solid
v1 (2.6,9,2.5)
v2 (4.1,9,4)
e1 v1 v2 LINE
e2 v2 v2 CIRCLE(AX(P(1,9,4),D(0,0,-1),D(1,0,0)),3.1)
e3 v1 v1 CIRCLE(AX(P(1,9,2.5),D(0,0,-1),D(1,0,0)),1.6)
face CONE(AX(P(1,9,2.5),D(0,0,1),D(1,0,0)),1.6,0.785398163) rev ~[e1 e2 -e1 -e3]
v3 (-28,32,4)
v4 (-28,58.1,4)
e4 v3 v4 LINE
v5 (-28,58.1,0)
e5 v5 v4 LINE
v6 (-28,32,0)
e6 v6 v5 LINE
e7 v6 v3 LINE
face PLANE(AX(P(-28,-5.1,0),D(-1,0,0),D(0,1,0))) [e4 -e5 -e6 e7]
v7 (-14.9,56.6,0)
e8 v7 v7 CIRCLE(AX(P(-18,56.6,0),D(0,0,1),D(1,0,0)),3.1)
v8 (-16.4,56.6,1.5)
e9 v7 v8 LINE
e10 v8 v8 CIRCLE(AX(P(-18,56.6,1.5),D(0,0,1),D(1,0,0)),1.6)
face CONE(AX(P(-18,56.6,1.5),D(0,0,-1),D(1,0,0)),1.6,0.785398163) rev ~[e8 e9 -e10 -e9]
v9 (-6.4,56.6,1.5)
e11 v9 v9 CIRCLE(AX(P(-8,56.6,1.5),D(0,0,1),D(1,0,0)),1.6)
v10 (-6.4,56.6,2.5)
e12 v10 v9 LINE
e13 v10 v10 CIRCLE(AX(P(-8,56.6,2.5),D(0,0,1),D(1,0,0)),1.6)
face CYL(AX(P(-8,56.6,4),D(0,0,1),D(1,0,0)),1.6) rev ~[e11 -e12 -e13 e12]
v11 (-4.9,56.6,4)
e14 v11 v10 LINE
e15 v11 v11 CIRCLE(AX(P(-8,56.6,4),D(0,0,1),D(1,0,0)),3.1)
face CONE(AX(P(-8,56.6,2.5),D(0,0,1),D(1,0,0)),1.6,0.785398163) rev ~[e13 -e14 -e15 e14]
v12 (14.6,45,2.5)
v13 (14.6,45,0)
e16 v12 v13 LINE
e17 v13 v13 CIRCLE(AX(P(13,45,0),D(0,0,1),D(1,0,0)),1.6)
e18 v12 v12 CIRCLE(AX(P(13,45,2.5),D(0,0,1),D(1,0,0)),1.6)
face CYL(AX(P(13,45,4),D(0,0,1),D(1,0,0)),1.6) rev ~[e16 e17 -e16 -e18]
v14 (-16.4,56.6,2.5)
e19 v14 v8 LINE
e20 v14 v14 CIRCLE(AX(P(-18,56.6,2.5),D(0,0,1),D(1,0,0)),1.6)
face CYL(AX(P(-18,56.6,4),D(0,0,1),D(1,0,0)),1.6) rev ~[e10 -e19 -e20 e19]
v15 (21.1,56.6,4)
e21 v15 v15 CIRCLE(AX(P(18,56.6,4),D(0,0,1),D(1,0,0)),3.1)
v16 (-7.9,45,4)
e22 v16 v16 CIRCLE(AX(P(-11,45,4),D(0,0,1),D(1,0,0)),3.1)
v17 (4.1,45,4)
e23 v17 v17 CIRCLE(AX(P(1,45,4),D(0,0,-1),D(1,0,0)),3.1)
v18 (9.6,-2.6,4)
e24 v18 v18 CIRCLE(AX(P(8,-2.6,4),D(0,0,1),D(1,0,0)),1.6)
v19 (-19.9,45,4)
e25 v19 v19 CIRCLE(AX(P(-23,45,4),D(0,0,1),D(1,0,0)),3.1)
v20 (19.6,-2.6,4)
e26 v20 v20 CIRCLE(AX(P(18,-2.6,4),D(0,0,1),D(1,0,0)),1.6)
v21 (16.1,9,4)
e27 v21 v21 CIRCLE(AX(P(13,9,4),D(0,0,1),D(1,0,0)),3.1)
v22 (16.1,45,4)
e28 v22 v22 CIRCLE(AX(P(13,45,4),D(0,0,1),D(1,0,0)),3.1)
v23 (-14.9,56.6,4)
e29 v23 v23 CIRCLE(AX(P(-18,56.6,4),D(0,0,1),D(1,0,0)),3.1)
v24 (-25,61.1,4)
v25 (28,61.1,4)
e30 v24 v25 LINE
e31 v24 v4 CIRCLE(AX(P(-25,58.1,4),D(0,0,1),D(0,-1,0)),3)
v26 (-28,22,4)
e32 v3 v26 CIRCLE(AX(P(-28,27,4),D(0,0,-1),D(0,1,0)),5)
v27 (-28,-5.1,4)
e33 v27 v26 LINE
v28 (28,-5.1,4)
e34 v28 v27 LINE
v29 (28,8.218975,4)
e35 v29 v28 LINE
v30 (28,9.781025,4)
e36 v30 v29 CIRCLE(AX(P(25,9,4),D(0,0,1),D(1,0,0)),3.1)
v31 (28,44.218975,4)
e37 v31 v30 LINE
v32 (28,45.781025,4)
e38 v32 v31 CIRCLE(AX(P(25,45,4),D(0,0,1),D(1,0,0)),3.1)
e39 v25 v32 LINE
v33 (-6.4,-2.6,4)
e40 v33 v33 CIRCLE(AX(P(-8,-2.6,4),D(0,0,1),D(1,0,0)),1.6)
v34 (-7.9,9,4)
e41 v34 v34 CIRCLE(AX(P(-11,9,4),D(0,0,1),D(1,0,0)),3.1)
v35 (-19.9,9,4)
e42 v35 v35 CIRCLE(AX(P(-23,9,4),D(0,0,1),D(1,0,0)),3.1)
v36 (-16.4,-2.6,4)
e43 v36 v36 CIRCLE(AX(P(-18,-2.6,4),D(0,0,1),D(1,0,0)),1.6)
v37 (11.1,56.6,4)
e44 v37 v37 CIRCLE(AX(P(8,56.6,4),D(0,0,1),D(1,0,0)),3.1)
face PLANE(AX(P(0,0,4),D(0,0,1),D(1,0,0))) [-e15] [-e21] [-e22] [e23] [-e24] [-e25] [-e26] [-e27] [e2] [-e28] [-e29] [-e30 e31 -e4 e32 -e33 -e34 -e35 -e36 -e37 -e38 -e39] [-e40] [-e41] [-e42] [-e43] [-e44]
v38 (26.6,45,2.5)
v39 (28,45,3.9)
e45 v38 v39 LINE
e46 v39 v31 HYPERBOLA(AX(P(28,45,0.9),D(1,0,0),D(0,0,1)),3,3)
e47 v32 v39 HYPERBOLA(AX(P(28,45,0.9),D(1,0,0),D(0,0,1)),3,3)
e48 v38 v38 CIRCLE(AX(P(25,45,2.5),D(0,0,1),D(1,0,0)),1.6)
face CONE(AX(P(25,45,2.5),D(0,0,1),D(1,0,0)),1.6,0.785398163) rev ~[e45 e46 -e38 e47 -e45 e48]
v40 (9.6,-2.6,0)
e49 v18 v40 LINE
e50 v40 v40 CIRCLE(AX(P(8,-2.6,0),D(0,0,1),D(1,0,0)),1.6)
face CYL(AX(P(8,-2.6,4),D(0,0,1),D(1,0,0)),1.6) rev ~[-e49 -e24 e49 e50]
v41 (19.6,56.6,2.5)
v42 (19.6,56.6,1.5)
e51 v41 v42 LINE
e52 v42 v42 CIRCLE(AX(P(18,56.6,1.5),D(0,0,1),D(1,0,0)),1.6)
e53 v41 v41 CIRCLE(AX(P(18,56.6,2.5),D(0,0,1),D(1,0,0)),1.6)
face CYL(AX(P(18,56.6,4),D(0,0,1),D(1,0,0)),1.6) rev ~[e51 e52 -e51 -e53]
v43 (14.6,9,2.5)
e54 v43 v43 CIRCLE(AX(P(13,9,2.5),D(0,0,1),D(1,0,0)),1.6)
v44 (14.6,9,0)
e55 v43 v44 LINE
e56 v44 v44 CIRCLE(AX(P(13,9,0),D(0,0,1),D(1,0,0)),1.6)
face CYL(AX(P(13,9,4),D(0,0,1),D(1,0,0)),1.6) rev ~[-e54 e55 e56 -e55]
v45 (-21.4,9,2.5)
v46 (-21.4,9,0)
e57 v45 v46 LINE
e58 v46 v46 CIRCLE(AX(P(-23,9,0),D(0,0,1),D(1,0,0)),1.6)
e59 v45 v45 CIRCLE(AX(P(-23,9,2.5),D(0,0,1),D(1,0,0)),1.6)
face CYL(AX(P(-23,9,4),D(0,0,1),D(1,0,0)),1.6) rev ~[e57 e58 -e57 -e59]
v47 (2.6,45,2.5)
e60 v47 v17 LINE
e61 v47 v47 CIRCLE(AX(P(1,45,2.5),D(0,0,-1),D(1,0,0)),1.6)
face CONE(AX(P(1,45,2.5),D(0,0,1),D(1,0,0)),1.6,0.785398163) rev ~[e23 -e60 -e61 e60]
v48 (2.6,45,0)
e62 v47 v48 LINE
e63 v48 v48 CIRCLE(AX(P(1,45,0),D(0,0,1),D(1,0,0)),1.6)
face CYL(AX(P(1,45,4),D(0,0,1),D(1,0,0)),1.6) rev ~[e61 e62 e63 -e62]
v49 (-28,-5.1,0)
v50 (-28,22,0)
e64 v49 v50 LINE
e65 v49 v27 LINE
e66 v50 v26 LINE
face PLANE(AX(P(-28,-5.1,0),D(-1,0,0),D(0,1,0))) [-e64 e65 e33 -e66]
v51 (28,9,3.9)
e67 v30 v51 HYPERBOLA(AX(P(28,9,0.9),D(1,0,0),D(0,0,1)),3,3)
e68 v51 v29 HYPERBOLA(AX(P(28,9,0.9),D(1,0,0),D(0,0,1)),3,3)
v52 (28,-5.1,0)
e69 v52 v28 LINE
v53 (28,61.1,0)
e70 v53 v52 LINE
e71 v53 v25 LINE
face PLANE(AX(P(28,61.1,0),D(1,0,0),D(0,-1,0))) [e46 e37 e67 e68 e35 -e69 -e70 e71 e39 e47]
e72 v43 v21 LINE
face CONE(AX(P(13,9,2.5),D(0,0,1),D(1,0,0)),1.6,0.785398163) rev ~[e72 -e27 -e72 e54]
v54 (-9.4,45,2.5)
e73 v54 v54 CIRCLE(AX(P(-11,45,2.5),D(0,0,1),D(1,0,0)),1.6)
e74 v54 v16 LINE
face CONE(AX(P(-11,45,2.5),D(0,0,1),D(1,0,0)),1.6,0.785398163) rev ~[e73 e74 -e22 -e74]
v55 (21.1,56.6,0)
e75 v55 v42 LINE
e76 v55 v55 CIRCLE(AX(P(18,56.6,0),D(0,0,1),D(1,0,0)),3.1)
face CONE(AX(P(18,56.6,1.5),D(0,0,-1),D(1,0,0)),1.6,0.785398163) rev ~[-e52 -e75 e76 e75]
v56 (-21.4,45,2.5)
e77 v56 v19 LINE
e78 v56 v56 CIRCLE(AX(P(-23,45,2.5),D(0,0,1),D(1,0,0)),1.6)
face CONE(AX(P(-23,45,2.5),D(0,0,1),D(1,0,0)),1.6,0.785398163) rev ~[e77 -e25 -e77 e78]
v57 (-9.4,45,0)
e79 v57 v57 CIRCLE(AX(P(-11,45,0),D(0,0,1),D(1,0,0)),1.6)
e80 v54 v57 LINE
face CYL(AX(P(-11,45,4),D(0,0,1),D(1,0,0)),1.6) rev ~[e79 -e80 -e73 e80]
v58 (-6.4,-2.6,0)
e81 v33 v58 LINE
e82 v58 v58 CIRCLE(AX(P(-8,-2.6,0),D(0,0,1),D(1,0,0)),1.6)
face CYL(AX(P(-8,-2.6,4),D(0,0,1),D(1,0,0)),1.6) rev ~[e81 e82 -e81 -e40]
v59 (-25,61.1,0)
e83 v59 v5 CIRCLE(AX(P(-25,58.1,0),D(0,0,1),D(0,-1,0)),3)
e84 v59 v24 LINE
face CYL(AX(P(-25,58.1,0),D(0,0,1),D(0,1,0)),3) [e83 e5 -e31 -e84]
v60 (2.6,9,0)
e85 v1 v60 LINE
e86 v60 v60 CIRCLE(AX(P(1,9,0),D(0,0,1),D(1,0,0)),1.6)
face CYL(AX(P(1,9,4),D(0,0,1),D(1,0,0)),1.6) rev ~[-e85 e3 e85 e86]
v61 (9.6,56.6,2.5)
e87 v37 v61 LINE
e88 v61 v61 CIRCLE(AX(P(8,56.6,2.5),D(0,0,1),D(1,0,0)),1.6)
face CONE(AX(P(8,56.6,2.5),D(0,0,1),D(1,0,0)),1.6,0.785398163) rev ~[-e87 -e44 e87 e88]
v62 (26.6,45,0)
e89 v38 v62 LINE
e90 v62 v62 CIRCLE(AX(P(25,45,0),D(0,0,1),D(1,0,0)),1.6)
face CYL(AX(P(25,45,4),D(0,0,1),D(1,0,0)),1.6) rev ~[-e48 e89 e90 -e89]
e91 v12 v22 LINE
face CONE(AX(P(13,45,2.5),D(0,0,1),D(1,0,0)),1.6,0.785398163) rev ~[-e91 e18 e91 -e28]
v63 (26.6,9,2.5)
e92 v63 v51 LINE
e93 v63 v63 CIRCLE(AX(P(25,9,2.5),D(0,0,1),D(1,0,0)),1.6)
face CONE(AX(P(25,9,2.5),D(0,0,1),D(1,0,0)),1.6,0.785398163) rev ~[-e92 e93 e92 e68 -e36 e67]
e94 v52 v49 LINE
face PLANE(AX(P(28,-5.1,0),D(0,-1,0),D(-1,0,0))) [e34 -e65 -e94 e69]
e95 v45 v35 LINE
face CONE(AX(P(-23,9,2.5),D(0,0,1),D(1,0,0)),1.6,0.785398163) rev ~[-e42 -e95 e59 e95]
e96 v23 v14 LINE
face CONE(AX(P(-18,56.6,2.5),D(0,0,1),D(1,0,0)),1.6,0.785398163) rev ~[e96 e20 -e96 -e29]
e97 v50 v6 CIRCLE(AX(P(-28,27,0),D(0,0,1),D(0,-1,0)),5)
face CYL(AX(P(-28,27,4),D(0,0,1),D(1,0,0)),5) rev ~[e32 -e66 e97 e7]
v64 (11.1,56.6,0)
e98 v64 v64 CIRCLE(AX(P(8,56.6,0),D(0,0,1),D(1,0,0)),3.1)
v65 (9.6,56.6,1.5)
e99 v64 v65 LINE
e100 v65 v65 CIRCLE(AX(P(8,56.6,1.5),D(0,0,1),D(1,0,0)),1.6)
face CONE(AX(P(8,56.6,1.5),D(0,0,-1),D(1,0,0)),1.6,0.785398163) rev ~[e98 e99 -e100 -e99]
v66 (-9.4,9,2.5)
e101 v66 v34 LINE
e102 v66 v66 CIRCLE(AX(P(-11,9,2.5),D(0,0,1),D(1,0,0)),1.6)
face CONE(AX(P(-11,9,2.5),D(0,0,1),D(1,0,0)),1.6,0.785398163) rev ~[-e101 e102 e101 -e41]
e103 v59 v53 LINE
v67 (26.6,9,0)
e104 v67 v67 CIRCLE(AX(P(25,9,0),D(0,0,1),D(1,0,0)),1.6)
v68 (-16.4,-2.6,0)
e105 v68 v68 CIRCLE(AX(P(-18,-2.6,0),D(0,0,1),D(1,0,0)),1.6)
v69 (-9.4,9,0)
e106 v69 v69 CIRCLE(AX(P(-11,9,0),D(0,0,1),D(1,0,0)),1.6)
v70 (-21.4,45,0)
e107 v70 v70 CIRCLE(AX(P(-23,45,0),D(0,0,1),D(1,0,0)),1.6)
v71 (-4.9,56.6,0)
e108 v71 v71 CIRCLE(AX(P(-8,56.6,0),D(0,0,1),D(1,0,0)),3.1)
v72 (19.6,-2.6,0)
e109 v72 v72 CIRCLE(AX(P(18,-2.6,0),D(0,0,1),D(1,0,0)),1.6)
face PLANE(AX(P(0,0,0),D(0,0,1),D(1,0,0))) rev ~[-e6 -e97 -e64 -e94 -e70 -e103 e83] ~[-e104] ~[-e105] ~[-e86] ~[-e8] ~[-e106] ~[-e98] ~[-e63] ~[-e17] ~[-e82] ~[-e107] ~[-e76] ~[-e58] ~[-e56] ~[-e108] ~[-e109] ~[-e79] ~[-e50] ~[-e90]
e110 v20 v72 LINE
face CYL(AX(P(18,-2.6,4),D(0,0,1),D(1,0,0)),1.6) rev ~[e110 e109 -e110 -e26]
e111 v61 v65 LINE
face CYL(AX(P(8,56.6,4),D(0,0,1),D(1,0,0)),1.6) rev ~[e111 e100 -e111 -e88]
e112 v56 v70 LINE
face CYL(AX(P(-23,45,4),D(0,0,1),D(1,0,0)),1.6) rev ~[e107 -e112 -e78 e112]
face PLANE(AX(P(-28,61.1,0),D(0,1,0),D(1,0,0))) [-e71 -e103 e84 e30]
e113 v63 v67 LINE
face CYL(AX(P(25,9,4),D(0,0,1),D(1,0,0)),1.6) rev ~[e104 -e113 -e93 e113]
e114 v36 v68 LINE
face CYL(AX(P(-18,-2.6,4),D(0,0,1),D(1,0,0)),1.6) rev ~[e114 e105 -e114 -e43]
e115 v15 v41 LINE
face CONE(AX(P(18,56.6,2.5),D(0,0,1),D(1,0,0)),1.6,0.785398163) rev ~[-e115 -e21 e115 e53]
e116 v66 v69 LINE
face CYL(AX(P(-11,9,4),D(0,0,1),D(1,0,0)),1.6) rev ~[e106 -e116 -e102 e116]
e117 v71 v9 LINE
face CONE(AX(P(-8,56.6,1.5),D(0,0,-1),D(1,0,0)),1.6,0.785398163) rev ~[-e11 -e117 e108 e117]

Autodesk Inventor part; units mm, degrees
ref_plane "YZ Plane" through (0, 0, 0) normal (1, 0, 0) x (0, 1, 0)
ref_plane "XZ Plane" through (0, 0, 0) normal (0, 1, 0) x (-1, 0, 0)
ref_plane "XY Plane" through (0, 0, 0) normal (0, 0, 1) x (1, 0, 0)
sketch "스케치1" plane through (0, 0, 0) normal (0, 0, 1) x (1, 0, 0)
  line L0 (-28, 61.1) -> (28, 61.1)
  line L1 (28, 61.1) -> (28, -5.1)
  line L2 (28, -5.1) -> (-28, -5.1)
  line L3 (-28, -5.1) -> (-28, 61.1)
  point P0 (0, 0)
  dimension "d0" = 66.2
  dimension "d2" = 5.1
  dimension "d8" = 28
  dimension "d9" = 28
extrude "돌출1" add sketch "스케치1" along normal blind 4
sketch "스케치2" plane through (0, 0, 4) normal (0, 0, 1) x (1, 0, 0)
  line L0 (-2, 48) -> (-2, 6)
  line L1 (-32, 48) -> (-7.5, 48)
  line L2 (-2, 48) -> (4.5, 48)
  line L3 (16.5, 6) -> (16.5, 48)
  line L4 (10, 48) -> (16.5, 48)
  line L5 (10, 48) -> (10, 6)
  line L6 (10, 6) -> (16.5, 6)
  circle A0 centre (13, 45) radius 1.6
  circle A1 centre (13, 9) radius 1.6
  line L7 (28.5, 6) -> (28.5, 48)
  line L8 (22, 48) -> (28.5, 48)
  line L9 (22, 48) -> (22, 6)
  line L10 (22, 6) -> (28.5, 6)
  circle A2 centre (25, 45) radius 1.6
  circle A3 centre (25, 9) radius 1.6
  line L11 (-7.5, 6) -> (-7.5, 48)
  line L12 (-32, 48) -> (-7.5, 48)
  line L13 (-32, 48) -> (-32, 52)
  line L14 (-38, 52) -> (-32, 52)
  line L15 (-38, 2) -> (-38, 52)
  line L16 (-38, 2) -> (-32, 2)
  line L17 (-32, 2) -> (-32, 6)
  line L18 (-32, 6) -> (-7.5, 6)
  circle A4 centre (-35, 45) radius 1.6
  circle A5 centre (-35, 9) radius 1.6
  circle A6 centre (-23, 45) radius 1.6
  circle A7 centre (-23, 9) radius 1.6
  circle A8 centre (-11, 45) radius 1.6
  circle A9 centre (-11, 9) radius 1.6
  line L19 (-2, 6) -> (4.5, 6)
  circle A10 centre (1, 45) radius 1.6
  circle A11 centre (1, 9) radius 1.6
  line L20 (-2, 48) -> (0, 48)
  line L21 (0, 48) -> (0, 6)
  point P0 (0, 0)
  point P1 (-13, 26)
  dimension "d7" = 2
extrude "돌출2" cut sketch "스케치2" against normal up to surface (4 mm away) contours L21 A10 | A10 L21 | L21 A11 | A11 L21 | A0 | A1 | A2 | A3 | A6 | A7 | A8 | A9
sketch "스케치3" plane through (0, 0, 4) normal (0, 0, 1) x (1, 0, 0)
  circle A0 centre (-23, 45) radius 1.6 projected
  circle A1 centre (-11, 45) radius 1.6 projected
  circle A2 centre (-11, 9) radius 1.6 projected
  circle A3 centre (25, 9) radius 1.6 projected
  circle A4 centre (13, 45) radius 1.6 projected
  circle A5 centre (1, 9) radius 1.6 projected
  circle A6 centre (1, 45) radius 1.6 projected
  circle A7 centre (13, 9) radius 1.6 projected
  circle A8 centre (25, 45) radius 1.6 projected
  circle A9 centre (-23, 9) radius 1.6 projected
  line L0 (28, 61.1) -> (-28, 61.1) projected
  line L1 (-28, 61.1) -> (-28, -5.1) projected
  line L2 (-28, -5.1) -> (28, -5.1) projected
  line L3 (28, -5.1) -> (28, 61.1) projected
  line L4 (-23, 45) -> (-23, 9)
  line L5 (-23, 27) -> (-28, 27)
  line L6 (-28, -5.1) -> (-28, 61.1) projected
  circle A10 centre (-28, 27) radius 5
  point P0 (0, 0)
  dimension "d12" = 18
  dimension "d15" = 10
extrude "돌출3" cut sketch "스케치3" against normal blind 4 contours A10 L5 L1 | L1 A10 | L5 A10 L1
sketch "스케치4" plane through (0, 0, 4) normal (0, 0, 1) x (1, 0, 0)
  arc A0 (-28, 22) -> (-28, 32) centre (-28, 27) ccw projected
  line L0 (-28, 22) -> (-28, -5.1) projected
  line L1 (-28, -5.1) -> (28, -5.1) projected
  line L2 (28, -5.1) -> (28, 61.1) projected
  line L3 (28, 61.1) -> (-28, 61.1) projected
  line L4 (-28, 61.1) -> (-28, 32) projected
  circle A1 centre (-23, 9) radius 1.6 projected
  circle A2 centre (25, 45) radius 1.6 projected
  circle A3 centre (13, 9) radius 1.6 projected
  circle A4 centre (1, 45) radius 1.6 projected
  circle A5 centre (1, 9) radius 1.6 projected
  circle A6 centre (13, 45) radius 1.6 projected
  circle A7 centre (25, 9) radius 1.6 projected
  circle A8 centre (-11, 9) radius 1.6 projected
  circle A9 centre (-11, 45) radius 1.6 projected
  circle A10 centre (-23, 45) radius 1.6 projected
  circle A11 centre (-18, -2.6) radius 1.6
  circle A12 centre (-8, -2.6) radius 1.6
  circle A13 centre (8, -2.6) radius 1.6
  circle A14 centre (18, -2.6) radius 1.6
  point P0 (0, 0)
  dimension "d16" = 3.2
  dimension "d17" = 3.2
  dimension "d18" = 3.2
  dimension "d19" = 3.2
  dimension "d20" = 2.5
  dimension "d21" = 2.5
  dimension "d22" = 2.5
  dimension "d23" = 2.5
  dimension "d24" = 10
  dimension "d25" = 20
  dimension "d26" = 10
  dimension "d27" = 20
extrude "돌출4" cut sketch "스케치4" against normal up to surface (4 mm away) contours A11 | A12 | A13 | A14
sketch "스케치5" plane through (0, 0, 4) normal (0, 0, 1) x (1, 0, 0)
  circle A0 centre (8, -2.6) radius 1.6 projected
  circle A1 centre (18, -2.6) radius 1.6 projected
  circle A2 centre (-8, -2.6) radius 1.6 projected
  circle A3 centre (-18, -2.6) radius 1.6 projected
  arc A4 (-28, 22) -> (-28, 32) centre (-28, 27) ccw projected
  line L0 (-28, 22) -> (-28, -5.1) projected
  line L1 (-28, -5.1) -> (28, -5.1) projected
  line L2 (28, -5.1) -> (28, 61.1) projected
  line L3 (28, 61.1) -> (-28, 61.1) projected
  line L4 (-28, 61.1) -> (-28, 32) projected
  circle A5 centre (-23, 9) radius 1.6 projected
  circle A6 centre (25, 45) radius 1.6 projected
  circle A7 centre (13, 9) radius 1.6 projected
  circle A8 centre (1, 45) radius 1.6 projected
  circle A9 centre (1, 9) radius 1.6 projected
  circle A10 centre (13, 45) radius 1.6 projected
  circle A11 centre (25, 9) radius 1.6 projected
  circle A12 centre (-11, 9) radius 1.6 projected
  circle A13 centre (-11, 45) radius 1.6 projected
  circle A14 centre (-23, 45) radius 1.6 projected
  circle A15 centre (-18, 56.6) radius 1.6
  circle A16 centre (-8, 56.6) radius 1.6
  circle A17 centre (8, 56.6) radius 1.6
  circle A18 centre (18, 56.6) radius 1.6
  point P0 (0, 0)
  dimension "d30" = 3.2
  dimension "d31" = 3.2
  dimension "d32" = 3.2
  dimension "d33" = 3.2
  dimension "d34" = 4.5
  dimension "d35" = 4.5
  dimension "d36" = 4.5
  dimension "d37" = 4.5
  dimension "d38" = 10
  dimension "d39" = 20
  dimension "d40" = 10
  dimension "d41" = 20
extrude "돌출5" cut sketch "스케치5" against normal up to surface (4 mm away) contours A15 | A16 | A17 | A18
fillet "모깎기1" radius 3 1 edges at (-28, 61.1, 2)
chamfer "모따기1" distance 1.5 angle 45 8 edges at (-19.6, 56.6, 4) (-9.6, 56.6, 4) (6.4, 56.6, 4) (16.4, 56.6, 4) (-19.6, 56.6, 0) (-9.6, 56.6, 0) (6.4, 56.6, 0) (16.4, 56.6, 0)
chamfer "모따기2" distance 1.5 angle 45 10 edges at (23.4, 45, 4) (11.4, 45, 4) (-0.6, 45, 4) (-12.6, 45, 4) (-24.6, 45, 4) (-24.6, 9, 4) (-12.6, 9, 4) (-0.6, 9, 4) (11.4, 9, 4) (23.4, 9, 4)
equation "\"d9\" = d8"
properties part number "J1J2_Side" material "알루미늄 6061"
